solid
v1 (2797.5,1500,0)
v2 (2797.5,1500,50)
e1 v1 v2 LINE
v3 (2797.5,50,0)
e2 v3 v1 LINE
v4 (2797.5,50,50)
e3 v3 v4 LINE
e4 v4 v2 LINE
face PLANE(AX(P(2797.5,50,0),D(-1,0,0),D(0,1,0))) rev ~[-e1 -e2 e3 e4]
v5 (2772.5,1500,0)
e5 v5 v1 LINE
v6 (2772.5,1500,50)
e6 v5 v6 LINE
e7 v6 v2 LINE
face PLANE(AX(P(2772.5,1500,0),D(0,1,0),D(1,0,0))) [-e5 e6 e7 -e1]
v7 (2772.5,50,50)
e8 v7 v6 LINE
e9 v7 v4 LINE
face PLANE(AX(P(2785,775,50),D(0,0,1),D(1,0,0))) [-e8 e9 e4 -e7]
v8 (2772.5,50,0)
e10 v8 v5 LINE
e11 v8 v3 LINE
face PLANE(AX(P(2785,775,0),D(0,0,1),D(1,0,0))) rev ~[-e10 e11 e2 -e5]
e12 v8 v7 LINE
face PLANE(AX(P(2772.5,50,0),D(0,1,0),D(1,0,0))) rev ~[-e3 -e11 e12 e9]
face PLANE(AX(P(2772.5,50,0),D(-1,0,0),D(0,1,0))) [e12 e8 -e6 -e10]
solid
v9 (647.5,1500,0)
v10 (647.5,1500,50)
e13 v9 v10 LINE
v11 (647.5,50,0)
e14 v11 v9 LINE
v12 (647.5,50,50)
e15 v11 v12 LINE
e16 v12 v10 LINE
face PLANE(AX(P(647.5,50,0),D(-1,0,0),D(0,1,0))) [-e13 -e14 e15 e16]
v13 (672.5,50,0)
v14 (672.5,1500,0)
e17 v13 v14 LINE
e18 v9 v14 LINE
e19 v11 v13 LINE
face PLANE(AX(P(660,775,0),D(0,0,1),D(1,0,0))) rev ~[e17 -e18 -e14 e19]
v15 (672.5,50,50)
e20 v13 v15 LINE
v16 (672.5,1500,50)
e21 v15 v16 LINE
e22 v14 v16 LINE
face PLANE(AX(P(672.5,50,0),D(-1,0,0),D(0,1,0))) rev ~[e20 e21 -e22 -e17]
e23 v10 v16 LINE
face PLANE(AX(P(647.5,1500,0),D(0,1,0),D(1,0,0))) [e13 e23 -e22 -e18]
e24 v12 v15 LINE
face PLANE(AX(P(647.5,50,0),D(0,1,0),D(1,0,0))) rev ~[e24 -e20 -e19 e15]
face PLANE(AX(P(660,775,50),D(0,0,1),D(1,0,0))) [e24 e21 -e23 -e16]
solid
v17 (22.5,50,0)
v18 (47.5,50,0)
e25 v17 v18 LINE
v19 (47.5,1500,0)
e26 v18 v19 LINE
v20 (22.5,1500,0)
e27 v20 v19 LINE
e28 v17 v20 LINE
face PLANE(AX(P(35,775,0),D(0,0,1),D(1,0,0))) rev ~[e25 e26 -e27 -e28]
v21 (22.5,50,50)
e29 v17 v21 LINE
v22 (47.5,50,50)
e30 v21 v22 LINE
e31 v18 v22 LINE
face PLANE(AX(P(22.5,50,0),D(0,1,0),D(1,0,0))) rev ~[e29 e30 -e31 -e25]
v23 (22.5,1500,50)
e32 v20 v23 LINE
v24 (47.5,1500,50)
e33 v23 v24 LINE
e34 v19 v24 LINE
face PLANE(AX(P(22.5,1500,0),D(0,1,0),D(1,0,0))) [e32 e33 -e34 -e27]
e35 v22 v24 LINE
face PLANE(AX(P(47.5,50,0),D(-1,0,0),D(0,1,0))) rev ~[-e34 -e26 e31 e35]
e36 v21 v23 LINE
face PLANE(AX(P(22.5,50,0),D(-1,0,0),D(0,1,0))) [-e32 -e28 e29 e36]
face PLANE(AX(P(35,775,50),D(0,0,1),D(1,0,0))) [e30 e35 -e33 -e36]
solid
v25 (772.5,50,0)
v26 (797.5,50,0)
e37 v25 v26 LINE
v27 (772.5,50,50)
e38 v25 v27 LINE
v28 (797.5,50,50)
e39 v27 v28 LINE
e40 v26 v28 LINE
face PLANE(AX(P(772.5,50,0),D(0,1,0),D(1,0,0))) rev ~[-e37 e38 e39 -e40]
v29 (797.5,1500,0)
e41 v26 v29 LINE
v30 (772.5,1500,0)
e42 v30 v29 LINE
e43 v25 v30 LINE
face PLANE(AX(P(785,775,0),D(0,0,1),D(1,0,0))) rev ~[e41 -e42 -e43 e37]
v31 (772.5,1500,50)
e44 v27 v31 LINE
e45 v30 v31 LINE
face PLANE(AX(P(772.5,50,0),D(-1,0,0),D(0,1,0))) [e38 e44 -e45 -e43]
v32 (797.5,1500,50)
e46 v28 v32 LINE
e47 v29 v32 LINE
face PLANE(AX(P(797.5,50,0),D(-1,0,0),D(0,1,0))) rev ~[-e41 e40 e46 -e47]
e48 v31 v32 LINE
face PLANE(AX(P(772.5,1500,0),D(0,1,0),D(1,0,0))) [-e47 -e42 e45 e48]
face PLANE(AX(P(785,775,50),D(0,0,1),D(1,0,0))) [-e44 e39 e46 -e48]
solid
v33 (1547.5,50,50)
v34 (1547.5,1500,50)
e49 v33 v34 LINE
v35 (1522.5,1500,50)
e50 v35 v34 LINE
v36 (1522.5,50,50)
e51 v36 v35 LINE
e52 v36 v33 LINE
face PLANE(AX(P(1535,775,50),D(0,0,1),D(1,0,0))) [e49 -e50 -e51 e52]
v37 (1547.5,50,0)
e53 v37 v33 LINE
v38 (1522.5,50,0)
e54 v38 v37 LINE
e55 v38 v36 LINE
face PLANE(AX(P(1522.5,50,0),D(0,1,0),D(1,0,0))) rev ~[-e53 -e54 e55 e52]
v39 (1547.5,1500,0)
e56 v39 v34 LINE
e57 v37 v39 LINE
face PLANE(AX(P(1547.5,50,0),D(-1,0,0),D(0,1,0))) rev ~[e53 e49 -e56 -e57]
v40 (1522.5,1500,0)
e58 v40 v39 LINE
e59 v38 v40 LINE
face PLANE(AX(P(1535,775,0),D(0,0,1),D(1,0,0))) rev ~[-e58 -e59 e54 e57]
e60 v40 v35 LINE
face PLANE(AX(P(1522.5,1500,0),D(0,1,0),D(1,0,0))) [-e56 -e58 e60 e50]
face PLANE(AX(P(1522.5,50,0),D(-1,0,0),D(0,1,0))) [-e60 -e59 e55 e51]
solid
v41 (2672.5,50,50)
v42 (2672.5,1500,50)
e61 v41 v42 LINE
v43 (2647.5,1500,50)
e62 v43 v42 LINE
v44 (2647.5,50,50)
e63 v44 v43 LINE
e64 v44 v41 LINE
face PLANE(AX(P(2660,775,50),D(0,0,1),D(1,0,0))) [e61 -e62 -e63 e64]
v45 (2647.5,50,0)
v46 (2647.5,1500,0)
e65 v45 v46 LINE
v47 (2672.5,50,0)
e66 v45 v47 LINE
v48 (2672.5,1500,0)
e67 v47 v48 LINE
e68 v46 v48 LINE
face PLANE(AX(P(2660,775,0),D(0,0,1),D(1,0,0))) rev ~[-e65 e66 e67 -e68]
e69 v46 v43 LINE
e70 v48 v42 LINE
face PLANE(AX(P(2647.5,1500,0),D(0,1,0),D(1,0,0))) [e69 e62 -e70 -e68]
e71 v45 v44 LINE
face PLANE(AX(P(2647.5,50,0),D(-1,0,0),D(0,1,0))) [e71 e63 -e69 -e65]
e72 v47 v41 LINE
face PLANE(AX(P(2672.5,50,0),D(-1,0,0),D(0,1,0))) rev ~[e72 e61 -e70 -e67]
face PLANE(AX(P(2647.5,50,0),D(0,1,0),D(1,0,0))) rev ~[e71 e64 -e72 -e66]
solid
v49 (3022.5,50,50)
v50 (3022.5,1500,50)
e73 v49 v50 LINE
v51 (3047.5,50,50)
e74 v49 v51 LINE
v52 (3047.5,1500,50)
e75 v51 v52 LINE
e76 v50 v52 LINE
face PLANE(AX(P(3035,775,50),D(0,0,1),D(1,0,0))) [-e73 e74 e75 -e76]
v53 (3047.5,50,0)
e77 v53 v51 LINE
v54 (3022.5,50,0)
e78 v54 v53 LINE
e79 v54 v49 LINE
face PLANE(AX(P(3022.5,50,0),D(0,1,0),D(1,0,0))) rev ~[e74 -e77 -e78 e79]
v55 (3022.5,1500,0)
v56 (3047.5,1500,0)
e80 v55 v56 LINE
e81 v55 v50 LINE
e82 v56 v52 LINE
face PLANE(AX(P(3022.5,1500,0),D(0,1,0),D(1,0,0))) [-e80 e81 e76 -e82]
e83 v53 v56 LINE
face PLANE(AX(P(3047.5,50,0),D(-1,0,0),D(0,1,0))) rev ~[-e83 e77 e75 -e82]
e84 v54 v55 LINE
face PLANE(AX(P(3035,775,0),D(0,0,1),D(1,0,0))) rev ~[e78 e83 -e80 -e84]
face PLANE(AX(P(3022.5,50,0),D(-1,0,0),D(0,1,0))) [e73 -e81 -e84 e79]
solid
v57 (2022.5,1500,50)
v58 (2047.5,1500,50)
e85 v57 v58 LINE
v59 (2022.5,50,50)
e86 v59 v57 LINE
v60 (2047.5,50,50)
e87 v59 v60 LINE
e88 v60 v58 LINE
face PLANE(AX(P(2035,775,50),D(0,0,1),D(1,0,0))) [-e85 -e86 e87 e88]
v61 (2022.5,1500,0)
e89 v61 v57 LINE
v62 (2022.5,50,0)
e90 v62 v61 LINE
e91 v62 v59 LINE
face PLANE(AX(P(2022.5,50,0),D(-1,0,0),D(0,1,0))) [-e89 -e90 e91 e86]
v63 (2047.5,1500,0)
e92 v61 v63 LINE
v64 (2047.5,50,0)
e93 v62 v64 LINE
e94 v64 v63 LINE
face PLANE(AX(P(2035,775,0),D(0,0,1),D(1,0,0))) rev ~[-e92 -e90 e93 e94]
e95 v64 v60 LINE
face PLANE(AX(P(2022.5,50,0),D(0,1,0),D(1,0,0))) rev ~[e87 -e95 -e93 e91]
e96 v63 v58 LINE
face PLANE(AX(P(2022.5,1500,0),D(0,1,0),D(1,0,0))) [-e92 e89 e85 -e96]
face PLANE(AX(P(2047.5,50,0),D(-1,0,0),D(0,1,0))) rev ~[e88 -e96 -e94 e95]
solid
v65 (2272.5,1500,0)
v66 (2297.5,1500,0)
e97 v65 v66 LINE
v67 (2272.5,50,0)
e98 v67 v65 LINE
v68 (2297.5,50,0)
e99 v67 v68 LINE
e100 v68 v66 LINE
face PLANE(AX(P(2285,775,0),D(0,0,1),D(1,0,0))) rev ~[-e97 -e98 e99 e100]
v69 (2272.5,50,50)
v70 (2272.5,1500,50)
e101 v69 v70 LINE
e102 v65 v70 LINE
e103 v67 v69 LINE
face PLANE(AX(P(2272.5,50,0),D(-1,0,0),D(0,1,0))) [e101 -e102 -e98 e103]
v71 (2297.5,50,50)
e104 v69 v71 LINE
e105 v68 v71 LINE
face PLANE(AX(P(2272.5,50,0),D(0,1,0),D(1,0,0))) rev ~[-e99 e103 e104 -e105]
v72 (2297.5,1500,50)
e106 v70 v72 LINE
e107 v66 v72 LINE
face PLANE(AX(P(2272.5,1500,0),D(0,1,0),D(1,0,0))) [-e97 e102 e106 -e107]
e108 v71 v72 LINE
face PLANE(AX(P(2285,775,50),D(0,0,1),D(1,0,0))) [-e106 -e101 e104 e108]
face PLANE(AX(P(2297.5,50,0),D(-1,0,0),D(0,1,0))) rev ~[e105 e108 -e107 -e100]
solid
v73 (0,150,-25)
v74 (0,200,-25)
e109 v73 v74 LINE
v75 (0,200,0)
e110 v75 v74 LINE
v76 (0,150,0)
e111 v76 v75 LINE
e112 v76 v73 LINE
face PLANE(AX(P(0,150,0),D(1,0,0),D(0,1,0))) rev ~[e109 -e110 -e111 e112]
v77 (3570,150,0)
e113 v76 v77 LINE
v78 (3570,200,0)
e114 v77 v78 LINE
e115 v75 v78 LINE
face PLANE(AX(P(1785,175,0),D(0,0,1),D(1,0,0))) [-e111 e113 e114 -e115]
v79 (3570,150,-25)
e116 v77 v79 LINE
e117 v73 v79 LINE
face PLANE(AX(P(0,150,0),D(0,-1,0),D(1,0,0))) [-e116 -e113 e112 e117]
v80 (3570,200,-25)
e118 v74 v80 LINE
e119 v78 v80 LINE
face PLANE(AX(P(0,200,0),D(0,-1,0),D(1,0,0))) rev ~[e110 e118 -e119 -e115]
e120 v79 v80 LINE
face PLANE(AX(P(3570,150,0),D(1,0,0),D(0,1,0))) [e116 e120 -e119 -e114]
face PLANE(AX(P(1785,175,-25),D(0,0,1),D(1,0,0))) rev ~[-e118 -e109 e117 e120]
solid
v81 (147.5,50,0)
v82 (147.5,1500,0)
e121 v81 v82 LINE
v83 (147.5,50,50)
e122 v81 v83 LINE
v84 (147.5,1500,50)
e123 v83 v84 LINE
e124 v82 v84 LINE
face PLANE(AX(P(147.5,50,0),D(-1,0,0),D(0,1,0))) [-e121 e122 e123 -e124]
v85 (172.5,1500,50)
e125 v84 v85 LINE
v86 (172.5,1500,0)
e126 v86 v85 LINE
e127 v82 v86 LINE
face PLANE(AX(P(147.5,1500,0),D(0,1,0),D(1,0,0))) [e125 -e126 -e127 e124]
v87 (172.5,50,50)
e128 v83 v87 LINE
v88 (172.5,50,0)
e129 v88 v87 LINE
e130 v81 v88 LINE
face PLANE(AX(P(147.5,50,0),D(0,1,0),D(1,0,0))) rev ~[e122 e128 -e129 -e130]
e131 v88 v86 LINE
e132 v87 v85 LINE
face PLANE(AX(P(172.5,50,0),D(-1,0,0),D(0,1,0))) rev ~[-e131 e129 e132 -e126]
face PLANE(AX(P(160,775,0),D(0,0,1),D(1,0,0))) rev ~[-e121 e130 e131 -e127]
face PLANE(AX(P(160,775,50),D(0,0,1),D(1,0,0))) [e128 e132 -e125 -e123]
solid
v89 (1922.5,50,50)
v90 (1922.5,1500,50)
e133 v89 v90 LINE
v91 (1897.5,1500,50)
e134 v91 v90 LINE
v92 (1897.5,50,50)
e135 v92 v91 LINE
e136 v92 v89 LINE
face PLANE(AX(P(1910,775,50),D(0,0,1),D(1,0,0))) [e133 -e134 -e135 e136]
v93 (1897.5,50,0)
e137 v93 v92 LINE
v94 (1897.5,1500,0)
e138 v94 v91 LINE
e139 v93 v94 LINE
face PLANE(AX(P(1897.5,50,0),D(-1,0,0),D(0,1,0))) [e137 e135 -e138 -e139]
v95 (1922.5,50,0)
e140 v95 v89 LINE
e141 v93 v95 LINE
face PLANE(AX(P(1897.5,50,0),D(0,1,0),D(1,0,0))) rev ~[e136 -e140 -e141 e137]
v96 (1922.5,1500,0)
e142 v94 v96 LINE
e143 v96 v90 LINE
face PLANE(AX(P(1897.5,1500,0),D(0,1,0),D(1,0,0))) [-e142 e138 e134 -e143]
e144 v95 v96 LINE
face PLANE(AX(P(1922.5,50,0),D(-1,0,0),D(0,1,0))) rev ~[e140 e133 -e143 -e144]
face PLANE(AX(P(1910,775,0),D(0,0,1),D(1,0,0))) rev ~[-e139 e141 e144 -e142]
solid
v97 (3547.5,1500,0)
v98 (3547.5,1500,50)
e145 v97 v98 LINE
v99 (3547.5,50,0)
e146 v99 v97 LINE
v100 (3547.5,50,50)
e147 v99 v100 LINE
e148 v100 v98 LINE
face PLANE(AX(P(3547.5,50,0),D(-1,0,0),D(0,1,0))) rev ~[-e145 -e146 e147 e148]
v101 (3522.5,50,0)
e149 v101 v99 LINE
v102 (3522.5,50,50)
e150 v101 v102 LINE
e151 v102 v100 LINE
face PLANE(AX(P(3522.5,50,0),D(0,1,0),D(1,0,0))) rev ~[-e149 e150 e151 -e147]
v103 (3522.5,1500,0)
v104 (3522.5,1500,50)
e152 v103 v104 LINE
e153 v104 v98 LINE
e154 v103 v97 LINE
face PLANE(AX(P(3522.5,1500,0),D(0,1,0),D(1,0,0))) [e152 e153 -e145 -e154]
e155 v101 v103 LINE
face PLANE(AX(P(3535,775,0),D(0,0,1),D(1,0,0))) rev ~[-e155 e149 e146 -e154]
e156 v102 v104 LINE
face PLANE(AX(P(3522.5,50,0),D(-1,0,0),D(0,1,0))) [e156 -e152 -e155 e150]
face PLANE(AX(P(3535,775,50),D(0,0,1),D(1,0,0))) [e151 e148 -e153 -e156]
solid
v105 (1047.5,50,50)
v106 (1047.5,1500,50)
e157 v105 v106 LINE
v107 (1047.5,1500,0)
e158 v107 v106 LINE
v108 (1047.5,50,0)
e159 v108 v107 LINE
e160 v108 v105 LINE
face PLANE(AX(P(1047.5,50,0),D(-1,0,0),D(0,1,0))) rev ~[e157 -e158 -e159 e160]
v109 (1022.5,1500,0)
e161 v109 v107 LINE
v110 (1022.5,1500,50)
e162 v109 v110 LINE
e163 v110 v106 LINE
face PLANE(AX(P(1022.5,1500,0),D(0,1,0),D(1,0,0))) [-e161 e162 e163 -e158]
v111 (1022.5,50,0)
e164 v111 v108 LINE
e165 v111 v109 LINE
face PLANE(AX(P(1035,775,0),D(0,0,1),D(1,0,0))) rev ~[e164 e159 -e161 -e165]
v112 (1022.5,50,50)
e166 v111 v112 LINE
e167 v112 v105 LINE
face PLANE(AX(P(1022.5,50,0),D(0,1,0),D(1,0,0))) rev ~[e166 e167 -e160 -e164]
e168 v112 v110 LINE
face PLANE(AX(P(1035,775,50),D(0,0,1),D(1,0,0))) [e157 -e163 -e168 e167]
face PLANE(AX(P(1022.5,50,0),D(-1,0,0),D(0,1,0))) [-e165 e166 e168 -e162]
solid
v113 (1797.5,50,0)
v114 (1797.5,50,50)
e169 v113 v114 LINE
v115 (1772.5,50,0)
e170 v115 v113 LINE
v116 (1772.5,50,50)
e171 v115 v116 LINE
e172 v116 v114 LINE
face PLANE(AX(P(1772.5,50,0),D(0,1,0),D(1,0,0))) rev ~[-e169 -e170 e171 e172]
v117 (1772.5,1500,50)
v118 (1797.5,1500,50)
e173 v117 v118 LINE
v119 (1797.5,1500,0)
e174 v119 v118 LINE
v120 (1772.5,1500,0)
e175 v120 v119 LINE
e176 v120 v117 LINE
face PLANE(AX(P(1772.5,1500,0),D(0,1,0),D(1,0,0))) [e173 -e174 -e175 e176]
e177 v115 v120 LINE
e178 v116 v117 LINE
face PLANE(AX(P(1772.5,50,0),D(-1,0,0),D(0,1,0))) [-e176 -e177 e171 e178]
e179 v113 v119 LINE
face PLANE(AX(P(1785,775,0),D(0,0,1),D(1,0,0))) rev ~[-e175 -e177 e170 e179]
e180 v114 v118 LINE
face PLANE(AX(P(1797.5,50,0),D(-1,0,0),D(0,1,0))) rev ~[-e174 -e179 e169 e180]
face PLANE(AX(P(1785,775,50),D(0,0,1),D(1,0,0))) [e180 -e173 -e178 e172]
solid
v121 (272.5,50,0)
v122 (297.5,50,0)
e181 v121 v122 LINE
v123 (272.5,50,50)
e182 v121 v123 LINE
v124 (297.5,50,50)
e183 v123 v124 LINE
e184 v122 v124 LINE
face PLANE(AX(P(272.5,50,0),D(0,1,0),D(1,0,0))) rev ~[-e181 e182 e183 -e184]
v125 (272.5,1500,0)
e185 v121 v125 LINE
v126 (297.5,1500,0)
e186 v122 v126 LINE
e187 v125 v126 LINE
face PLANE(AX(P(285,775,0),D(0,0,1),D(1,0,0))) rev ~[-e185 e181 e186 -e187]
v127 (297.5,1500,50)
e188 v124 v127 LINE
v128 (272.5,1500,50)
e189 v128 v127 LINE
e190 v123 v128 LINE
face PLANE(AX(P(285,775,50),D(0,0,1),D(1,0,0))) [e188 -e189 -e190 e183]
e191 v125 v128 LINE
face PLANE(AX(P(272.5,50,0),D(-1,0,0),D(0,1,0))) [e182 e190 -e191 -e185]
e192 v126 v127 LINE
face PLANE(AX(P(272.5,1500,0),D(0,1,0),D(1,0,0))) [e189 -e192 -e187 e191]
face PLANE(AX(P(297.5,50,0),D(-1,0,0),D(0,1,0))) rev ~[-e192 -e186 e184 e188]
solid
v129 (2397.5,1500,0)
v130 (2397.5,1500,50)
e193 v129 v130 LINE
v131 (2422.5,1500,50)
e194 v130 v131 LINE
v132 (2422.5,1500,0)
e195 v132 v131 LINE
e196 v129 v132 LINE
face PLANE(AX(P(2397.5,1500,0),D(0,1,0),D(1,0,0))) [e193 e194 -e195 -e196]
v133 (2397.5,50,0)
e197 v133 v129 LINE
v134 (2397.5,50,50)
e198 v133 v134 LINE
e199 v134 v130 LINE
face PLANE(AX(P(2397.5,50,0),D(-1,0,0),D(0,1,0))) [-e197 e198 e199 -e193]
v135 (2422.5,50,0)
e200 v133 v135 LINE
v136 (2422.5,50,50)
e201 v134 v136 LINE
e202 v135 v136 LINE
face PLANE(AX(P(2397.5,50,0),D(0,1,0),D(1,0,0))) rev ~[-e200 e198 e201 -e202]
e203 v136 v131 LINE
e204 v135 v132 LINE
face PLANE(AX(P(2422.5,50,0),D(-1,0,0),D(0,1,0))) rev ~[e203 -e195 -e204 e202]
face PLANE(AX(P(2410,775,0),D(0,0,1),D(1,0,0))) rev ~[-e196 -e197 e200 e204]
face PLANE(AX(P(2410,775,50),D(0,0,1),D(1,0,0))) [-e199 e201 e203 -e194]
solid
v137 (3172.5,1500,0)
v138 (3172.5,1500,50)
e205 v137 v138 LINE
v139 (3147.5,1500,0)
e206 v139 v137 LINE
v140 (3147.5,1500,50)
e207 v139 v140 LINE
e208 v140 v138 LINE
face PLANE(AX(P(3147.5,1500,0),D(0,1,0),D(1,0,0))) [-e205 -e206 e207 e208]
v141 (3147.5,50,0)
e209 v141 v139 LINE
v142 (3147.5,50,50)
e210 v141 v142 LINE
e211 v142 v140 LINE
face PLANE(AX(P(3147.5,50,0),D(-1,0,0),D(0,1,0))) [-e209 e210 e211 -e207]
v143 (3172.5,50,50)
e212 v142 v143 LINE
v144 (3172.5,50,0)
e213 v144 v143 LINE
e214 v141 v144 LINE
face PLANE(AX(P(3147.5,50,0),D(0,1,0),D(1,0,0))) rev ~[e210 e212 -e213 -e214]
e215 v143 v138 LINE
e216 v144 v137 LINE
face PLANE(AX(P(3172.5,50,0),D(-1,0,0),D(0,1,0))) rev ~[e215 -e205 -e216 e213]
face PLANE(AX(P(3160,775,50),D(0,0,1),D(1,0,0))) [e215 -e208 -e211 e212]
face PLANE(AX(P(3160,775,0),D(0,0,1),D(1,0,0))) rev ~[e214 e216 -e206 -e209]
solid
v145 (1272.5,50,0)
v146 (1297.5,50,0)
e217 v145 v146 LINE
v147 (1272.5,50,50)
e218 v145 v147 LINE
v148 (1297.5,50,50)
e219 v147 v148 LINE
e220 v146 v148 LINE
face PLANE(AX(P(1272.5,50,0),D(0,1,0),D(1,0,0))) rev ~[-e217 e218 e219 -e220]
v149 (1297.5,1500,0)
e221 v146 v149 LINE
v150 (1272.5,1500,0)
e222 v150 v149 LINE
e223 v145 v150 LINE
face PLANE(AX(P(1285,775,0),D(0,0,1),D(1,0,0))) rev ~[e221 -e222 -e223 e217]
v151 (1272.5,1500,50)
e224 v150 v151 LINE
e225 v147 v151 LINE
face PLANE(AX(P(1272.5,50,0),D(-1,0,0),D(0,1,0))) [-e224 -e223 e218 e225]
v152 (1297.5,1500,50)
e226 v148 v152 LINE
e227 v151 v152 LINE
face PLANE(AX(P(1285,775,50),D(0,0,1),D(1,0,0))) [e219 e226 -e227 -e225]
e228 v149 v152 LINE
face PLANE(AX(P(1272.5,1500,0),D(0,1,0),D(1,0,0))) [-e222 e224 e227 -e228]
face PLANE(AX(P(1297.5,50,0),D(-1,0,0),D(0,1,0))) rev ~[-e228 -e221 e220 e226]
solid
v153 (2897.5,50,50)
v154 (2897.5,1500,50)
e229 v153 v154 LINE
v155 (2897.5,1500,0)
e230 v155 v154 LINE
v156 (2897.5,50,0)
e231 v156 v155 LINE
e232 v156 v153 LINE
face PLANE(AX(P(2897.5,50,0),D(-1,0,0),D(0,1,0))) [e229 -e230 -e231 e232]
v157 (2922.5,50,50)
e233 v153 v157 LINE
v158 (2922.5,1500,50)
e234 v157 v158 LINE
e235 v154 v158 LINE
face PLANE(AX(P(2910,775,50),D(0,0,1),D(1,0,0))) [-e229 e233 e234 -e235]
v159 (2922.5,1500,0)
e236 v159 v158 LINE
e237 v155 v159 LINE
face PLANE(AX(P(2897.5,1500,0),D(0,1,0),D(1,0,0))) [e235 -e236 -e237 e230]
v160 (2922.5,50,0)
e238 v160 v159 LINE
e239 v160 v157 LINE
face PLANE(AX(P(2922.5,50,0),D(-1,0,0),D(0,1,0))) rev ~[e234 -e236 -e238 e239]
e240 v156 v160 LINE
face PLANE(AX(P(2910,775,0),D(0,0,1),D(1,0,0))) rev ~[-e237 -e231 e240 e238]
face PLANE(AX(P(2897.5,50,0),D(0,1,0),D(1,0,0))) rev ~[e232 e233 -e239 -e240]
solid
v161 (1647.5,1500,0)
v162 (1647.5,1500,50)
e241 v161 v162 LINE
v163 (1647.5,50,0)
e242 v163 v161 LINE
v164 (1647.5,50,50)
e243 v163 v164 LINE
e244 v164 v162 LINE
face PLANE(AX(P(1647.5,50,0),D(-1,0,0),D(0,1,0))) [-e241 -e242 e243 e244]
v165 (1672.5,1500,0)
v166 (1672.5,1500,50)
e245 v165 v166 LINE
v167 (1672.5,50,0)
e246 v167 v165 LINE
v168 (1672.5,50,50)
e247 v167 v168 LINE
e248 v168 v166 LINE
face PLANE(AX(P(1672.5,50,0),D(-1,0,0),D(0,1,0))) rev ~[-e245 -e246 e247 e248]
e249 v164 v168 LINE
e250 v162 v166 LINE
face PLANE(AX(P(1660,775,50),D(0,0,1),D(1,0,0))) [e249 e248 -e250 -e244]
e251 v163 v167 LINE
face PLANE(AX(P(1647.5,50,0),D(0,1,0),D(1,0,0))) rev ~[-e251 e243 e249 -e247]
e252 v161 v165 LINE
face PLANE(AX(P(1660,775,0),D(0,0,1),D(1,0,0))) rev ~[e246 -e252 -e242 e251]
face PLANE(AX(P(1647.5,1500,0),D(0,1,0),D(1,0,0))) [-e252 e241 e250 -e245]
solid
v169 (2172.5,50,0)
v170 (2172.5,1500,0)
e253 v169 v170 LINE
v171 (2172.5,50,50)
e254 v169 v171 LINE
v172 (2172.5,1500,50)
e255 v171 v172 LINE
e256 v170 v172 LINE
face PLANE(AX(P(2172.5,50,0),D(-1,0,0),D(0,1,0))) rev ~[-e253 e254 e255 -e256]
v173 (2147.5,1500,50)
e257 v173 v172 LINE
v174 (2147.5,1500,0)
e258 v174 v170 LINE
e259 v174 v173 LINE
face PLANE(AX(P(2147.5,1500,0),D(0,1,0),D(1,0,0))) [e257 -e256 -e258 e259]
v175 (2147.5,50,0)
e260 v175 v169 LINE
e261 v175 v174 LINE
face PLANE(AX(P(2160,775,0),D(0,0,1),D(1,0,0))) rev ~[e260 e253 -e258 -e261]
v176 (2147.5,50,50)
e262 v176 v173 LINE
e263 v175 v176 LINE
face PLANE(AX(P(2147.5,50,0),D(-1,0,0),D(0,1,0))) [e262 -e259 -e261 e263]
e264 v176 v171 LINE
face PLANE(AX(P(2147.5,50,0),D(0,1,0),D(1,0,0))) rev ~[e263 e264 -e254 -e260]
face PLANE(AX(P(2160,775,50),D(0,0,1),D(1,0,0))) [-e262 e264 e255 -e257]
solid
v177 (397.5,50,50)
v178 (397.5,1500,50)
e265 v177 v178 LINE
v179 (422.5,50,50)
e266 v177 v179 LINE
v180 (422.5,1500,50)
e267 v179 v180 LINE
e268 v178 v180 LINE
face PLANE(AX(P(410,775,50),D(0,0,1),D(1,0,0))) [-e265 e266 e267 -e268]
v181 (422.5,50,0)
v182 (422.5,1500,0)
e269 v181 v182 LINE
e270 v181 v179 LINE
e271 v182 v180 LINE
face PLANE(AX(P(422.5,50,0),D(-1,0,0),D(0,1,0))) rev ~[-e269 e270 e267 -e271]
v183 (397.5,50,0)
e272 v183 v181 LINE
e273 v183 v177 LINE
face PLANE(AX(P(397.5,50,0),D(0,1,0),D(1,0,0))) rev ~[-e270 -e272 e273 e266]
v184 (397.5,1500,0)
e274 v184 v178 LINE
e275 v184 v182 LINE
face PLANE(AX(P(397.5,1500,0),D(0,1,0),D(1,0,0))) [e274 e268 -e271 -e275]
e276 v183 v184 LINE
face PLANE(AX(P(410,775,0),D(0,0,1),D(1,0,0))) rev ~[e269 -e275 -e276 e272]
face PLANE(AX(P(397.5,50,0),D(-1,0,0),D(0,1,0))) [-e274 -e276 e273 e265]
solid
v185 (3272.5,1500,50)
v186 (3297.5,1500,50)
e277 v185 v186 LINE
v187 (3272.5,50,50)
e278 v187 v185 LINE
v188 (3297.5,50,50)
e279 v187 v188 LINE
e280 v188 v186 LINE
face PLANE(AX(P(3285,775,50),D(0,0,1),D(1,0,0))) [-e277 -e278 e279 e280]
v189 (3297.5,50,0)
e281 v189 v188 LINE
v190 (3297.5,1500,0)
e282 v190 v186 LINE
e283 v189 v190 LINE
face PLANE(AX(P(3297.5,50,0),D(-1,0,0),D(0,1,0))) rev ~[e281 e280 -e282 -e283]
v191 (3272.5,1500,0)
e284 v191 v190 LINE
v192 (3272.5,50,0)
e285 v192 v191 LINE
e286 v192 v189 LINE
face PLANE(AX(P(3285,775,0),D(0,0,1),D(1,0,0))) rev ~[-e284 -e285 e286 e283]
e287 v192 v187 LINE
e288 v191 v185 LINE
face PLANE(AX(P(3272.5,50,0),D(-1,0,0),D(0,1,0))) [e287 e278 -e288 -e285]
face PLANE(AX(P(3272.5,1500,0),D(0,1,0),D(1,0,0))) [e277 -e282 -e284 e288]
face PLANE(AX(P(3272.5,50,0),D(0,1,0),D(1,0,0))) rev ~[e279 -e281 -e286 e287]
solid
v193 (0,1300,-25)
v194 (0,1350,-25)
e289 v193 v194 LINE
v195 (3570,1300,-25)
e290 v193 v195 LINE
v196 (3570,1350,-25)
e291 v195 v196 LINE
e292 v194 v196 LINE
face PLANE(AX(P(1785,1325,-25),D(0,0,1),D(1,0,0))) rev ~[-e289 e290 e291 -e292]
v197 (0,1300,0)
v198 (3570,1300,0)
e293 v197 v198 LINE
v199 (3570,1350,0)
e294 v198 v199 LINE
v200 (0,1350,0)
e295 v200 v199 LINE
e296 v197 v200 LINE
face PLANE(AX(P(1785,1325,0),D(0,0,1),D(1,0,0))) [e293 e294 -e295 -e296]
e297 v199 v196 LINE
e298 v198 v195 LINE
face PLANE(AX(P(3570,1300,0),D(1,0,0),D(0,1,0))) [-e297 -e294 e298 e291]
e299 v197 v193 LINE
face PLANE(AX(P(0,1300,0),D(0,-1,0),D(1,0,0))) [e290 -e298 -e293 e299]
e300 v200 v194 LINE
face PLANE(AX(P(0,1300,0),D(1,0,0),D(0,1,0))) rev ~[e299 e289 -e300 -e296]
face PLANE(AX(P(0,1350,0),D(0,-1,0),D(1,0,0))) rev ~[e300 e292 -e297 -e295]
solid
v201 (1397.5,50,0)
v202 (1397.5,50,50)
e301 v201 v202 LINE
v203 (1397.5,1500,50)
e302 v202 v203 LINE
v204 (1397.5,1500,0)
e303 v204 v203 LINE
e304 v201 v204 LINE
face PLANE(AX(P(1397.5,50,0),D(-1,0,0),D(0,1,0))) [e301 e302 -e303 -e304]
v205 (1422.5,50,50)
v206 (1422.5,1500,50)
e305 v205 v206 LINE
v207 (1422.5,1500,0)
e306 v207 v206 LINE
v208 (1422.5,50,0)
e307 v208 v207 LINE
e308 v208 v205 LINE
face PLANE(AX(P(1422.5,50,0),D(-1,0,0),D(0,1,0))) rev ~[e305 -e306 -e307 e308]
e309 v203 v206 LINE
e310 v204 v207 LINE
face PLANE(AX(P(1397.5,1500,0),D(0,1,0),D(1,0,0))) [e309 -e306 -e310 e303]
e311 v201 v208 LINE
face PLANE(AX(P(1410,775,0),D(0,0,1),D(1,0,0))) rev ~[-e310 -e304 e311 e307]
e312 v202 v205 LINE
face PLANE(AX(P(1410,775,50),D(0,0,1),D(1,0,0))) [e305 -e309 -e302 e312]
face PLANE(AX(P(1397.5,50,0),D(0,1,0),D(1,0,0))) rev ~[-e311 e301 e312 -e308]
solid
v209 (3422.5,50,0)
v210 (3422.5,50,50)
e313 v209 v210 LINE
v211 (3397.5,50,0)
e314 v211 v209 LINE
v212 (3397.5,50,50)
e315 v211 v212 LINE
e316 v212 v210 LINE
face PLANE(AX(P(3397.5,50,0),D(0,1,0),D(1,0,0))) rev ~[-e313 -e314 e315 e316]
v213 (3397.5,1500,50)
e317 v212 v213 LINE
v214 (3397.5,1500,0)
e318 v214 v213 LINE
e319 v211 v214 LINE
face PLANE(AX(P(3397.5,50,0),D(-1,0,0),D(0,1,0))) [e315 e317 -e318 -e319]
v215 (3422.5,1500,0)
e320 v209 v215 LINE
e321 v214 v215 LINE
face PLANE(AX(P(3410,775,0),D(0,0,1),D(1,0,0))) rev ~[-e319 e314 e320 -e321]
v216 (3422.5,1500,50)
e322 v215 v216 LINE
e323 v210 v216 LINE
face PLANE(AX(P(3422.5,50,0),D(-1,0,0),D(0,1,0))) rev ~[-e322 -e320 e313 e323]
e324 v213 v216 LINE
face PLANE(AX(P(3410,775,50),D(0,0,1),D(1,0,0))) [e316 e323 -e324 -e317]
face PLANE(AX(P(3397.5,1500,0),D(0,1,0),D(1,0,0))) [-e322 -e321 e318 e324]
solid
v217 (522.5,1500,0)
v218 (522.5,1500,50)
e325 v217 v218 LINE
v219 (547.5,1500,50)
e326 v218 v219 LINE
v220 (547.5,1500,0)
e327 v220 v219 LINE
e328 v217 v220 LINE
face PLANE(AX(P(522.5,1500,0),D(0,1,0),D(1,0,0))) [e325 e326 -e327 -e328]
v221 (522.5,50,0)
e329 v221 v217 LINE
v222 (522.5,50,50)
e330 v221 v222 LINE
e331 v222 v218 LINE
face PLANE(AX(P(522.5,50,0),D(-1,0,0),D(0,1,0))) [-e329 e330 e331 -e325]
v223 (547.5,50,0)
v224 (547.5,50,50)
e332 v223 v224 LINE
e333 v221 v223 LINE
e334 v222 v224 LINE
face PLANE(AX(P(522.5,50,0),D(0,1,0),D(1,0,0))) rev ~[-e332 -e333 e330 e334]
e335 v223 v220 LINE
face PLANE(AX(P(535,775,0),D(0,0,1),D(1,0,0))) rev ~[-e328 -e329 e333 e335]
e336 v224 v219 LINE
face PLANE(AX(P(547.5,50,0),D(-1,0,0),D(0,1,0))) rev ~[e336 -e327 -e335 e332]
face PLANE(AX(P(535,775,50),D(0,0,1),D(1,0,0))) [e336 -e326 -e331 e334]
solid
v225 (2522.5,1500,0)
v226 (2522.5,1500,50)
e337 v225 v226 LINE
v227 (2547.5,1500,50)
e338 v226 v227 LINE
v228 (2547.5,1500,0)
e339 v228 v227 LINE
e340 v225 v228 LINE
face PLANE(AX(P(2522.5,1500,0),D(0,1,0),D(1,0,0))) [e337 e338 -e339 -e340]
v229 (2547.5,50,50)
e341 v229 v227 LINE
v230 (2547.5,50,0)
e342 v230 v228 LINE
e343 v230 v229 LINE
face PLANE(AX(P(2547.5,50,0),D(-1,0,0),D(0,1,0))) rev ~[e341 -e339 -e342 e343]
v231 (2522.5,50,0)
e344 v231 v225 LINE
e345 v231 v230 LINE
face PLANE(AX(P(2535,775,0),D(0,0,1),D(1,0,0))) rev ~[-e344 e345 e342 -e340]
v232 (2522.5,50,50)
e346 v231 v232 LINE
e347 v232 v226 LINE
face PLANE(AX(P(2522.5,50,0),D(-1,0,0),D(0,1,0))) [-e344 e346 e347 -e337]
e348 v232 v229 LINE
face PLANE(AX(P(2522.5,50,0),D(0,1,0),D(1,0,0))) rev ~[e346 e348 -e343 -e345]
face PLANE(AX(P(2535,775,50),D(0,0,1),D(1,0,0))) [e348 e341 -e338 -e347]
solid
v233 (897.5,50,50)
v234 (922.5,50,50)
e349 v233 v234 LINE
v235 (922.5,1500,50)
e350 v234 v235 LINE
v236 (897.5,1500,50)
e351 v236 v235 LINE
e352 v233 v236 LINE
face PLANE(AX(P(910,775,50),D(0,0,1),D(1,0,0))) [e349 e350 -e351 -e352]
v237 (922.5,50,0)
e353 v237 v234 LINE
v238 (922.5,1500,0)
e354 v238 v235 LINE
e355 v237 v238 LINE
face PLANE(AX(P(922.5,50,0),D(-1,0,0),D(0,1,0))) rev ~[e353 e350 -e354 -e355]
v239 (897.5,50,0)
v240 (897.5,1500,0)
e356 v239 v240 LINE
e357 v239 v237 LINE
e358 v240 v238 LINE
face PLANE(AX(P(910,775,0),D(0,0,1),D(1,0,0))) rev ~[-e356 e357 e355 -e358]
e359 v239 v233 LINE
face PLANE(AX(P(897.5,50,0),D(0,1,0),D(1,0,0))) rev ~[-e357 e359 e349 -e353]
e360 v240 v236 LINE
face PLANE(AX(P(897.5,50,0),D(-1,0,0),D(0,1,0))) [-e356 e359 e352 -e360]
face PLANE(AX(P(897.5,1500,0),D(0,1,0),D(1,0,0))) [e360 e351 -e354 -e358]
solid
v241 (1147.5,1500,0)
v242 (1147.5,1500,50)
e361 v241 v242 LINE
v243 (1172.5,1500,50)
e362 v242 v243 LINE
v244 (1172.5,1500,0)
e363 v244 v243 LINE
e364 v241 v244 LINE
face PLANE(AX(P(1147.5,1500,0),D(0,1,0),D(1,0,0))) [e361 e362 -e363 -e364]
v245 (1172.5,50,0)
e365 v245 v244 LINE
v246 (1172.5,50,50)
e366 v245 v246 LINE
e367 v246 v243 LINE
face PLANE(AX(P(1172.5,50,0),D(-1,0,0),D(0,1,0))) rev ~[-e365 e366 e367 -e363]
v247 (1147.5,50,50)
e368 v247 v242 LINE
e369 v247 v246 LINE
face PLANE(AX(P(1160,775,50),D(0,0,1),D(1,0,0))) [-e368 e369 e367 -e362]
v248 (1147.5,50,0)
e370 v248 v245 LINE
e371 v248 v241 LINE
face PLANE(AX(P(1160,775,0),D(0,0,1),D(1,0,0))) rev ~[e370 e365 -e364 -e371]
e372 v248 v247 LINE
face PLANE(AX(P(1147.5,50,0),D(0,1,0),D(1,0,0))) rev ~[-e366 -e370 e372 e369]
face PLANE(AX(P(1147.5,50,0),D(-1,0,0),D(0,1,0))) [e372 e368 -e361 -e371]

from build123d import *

# Parameters (mm, degrees)
F0_W     = 25
F0_H     = 1450
F1_DEPTH = 50
F2_W     = 3570
F2_H     = 50
F3_DEPTH = 25


# Not quite as in the source:
# - a feature names something its author has since deleted; it is built from what else it names


with BuildPart() as f1:
    # F0 (on Top) → F1 (new body)
    with BuildSketch(Plane.XY):
        with Locations((35, 775)):
            Rectangle(F0_W, F0_H)
    extrude(amount=F1_DEPTH)


with BuildPart() as f1b:
    # F0 (on Top) → F1, piece 2 (new body)
    with BuildSketch(Plane.XY):
        with Locations((160, 775)):
            Rectangle(F0_W, F0_H)
    extrude(amount=F1_DEPTH)


with BuildPart() as f1c:
    # F0 (on Top) → F1, piece 3 (new body)
    with BuildSketch(Plane.XY):
        with Locations((285, 775)):
            Rectangle(F0_W, F0_H)
    extrude(amount=F1_DEPTH)


with BuildPart() as f1d:
    # F0 (on Top) → F1, piece 4 (new body)
    with BuildSketch(Plane.XY):
        with Locations((410, 775)):
            Rectangle(F0_W, F0_H)
    extrude(amount=F1_DEPTH)


with BuildPart() as f1e:
    # F0 (on Top) → F1, piece 5 (new body)
    with BuildSketch(Plane.XY):
        with Locations((535, 775)):
            Rectangle(F0_W, F0_H)
    extrude(amount=F1_DEPTH)


with BuildPart() as f1f:
    # F0 (on Top) → F1, piece 6 (new body)
    with BuildSketch(Plane.XY):
        with Locations((660, 775)):
            Rectangle(F0_W, F0_H)
    extrude(amount=F1_DEPTH)


with BuildPart() as f1g:
    # F0 (on Top) → F1, piece 7 (new body)
    with BuildSketch(Plane.XY):
        with Locations((785, 775)):
            Rectangle(F0_W, F0_H)
    extrude(amount=F1_DEPTH)


with BuildPart() as f1h:
    # F0 (on Top) → F1, piece 8 (new body)
    with BuildSketch(Plane.XY):
        with Locations((910, 775)):
            Rectangle(F0_W, F0_H)
    extrude(amount=F1_DEPTH)


with BuildPart() as f1i:
    # F0 (on Top) → F1, piece 9 (new body)
    with BuildSketch(Plane.XY):
        with Locations((1035, 775)):
            Rectangle(F0_W, F0_H)
    extrude(amount=F1_DEPTH)


with BuildPart() as f1j:
    # F0 (on Top) → F1, piece 10 (new body)
    with BuildSketch(Plane.XY):
        with Locations((1160, 775)):
            Rectangle(F0_W, F0_H)
    extrude(amount=F1_DEPTH)


with BuildPart() as f1k:
    # F0 (on Top) → F1, piece 11 (new body)
    with BuildSketch(Plane.XY):
        with Locations((1285, 775)):
            Rectangle(F0_W, F0_H)
    extrude(amount=F1_DEPTH)


with BuildPart() as f1l:
    # F0 (on Top) → F1, piece 12 (new body)
    with BuildSketch(Plane.XY):
        with Locations((1410, 775)):
            Rectangle(F0_W, F0_H)
    extrude(amount=F1_DEPTH)


with BuildPart() as f1m:
    # F0 (on Top) → F1, piece 13 (new body)
    with BuildSketch(Plane.XY):
        with Locations((1535, 775)):
            Rectangle(F0_W, F0_H)
    extrude(amount=F1_DEPTH)


with BuildPart() as f1n:
    # F0 (on Top) → F1, piece 14 (new body)
    with BuildSketch(Plane.XY):
        with Locations((1660, 775)):
            Rectangle(F0_W, F0_H)
    extrude(amount=F1_DEPTH)


with BuildPart() as f1o:
    # F0 (on Top) → F1, piece 15 (new body)
    with BuildSketch(Plane.XY):
        with Locations((1785, 775)):
            Rectangle(F0_W, F0_H)
    extrude(amount=F1_DEPTH)


with BuildPart() as f1p:
    # F0 (on Top) → F1, piece 16 (new body)
    with BuildSketch(Plane.XY):
        with Locations((1910, 775)):
            Rectangle(F0_W, F0_H)
    extrude(amount=F1_DEPTH)


with BuildPart() as f1q:
    # F0 (on Top) → F1, piece 17 (new body)
    with BuildSketch(Plane.XY):
        with Locations((2035, 775)):
            Rectangle(F0_W, F0_H)
    extrude(amount=F1_DEPTH)


with BuildPart() as f1r:
    # F0 (on Top) → F1, piece 18 (new body)
    with BuildSketch(Plane.XY):
        with Locations((2160, 775)):
            Rectangle(F0_W, F0_H)
    extrude(amount=F1_DEPTH)


with BuildPart() as f1s:
    # F0 (on Top) → F1, piece 19 (new body)
    with BuildSketch(Plane.XY):
        with Locations((2285, 775)):
            Rectangle(F0_W, F0_H)
    extrude(amount=F1_DEPTH)


with BuildPart() as f1t:
    # F0 (on Top) → F1, piece 20 (new body)
    with BuildSketch(Plane.XY):
        with Locations((2410, 775)):
            Rectangle(F0_W, F0_H)
    extrude(amount=F1_DEPTH)


with BuildPart() as f1u:
    # F0 (on Top) → F1, piece 21 (new body)
    with BuildSketch(Plane.XY):
        with Locations((2535, 775)):
            Rectangle(F0_W, F0_H)
    extrude(amount=F1_DEPTH)


with BuildPart() as f1v:
    # F0 (on Top) → F1, piece 22 (new body)
    with BuildSketch(Plane.XY):
        with Locations((2660, 775)):
            Rectangle(F0_W, F0_H)
    extrude(amount=F1_DEPTH)


with BuildPart() as f1w:
    # F0 (on Top) → F1, piece 23 (new body)
    with BuildSketch(Plane.XY):
        with Locations((2785, 775)):
            Rectangle(F0_W, F0_H)
    extrude(amount=F1_DEPTH)


with BuildPart() as f1x:
    # F0 (on Top) → F1, piece 24 (new body)
    with BuildSketch(Plane.XY):
        with Locations((2910, 775)):
            Rectangle(F0_W, F0_H)
    extrude(amount=F1_DEPTH)


with BuildPart() as f1y:
    # F0 (on Top) → F1, piece 25 (new body)
    with BuildSketch(Plane.XY):
        with Locations((3035, 775)):
            Rectangle(F0_W, F0_H)
    extrude(amount=F1_DEPTH)


with BuildPart() as f1z:
    # F0 (on Top) → F1, piece 26 (new body)
    with BuildSketch(Plane.XY):
        with Locations((3160, 775)):
            Rectangle(F0_W, F0_H)
    extrude(amount=F1_DEPTH)


with BuildPart() as f1ba:
    # F0 (on Top) → F1, piece 27 (new body)
    with BuildSketch(Plane.XY):
        with Locations((3285, 775)):
            Rectangle(F0_W, F0_H)
    extrude(amount=F1_DEPTH)


with BuildPart() as f1bb:
    # F0 (on Top) → F1, piece 28 (new body)
    with BuildSketch(Plane.XY):
        with Locations((3410, 775)):
            Rectangle(F0_W, F0_H)
    extrude(amount=F1_DEPTH)


with BuildPart() as f1bc:
    # F0 (on Top) → F1, piece 29 (new body)
    with BuildSketch(Plane.XY):
        with Locations((3535, 775)):
            Rectangle(F0_W, F0_H)
    extrude(amount=F1_DEPTH)


with BuildPart() as f3:
    # F2 (on Top) → F3 (new body)
    with BuildSketch(Plane.XY):
        with Locations((1785, 175)):
            Rectangle(F2_W, F2_H)
    extrude(amount=-F3_DEPTH)


with BuildPart() as f3b:
    # F2 (on Top) → F3, piece 2 (new body)
    with BuildSketch(Plane.XY):
        with Locations((1785, 1325)):
            Rectangle(F2_W, F2_H)
    extrude(amount=-F3_DEPTH)


solid = Compound([f1.part, f1b.part, f1c.part, f1d.part, f1e.part, f1f.part, f1g.part, f1h.part, f1i.part, f1j.part, f1k.part, f1l.part, f1m.part, f1n.part, f1o.part, f1p.part, f1q.part, f1r.part, f1s.part, f1t.part, f1u.part, f1v.part, f1w.part, f1x.part, f1y.part, f1z.part, f1ba.part, f1bb.part, f1bc.part, f3.part, f3b.part])
